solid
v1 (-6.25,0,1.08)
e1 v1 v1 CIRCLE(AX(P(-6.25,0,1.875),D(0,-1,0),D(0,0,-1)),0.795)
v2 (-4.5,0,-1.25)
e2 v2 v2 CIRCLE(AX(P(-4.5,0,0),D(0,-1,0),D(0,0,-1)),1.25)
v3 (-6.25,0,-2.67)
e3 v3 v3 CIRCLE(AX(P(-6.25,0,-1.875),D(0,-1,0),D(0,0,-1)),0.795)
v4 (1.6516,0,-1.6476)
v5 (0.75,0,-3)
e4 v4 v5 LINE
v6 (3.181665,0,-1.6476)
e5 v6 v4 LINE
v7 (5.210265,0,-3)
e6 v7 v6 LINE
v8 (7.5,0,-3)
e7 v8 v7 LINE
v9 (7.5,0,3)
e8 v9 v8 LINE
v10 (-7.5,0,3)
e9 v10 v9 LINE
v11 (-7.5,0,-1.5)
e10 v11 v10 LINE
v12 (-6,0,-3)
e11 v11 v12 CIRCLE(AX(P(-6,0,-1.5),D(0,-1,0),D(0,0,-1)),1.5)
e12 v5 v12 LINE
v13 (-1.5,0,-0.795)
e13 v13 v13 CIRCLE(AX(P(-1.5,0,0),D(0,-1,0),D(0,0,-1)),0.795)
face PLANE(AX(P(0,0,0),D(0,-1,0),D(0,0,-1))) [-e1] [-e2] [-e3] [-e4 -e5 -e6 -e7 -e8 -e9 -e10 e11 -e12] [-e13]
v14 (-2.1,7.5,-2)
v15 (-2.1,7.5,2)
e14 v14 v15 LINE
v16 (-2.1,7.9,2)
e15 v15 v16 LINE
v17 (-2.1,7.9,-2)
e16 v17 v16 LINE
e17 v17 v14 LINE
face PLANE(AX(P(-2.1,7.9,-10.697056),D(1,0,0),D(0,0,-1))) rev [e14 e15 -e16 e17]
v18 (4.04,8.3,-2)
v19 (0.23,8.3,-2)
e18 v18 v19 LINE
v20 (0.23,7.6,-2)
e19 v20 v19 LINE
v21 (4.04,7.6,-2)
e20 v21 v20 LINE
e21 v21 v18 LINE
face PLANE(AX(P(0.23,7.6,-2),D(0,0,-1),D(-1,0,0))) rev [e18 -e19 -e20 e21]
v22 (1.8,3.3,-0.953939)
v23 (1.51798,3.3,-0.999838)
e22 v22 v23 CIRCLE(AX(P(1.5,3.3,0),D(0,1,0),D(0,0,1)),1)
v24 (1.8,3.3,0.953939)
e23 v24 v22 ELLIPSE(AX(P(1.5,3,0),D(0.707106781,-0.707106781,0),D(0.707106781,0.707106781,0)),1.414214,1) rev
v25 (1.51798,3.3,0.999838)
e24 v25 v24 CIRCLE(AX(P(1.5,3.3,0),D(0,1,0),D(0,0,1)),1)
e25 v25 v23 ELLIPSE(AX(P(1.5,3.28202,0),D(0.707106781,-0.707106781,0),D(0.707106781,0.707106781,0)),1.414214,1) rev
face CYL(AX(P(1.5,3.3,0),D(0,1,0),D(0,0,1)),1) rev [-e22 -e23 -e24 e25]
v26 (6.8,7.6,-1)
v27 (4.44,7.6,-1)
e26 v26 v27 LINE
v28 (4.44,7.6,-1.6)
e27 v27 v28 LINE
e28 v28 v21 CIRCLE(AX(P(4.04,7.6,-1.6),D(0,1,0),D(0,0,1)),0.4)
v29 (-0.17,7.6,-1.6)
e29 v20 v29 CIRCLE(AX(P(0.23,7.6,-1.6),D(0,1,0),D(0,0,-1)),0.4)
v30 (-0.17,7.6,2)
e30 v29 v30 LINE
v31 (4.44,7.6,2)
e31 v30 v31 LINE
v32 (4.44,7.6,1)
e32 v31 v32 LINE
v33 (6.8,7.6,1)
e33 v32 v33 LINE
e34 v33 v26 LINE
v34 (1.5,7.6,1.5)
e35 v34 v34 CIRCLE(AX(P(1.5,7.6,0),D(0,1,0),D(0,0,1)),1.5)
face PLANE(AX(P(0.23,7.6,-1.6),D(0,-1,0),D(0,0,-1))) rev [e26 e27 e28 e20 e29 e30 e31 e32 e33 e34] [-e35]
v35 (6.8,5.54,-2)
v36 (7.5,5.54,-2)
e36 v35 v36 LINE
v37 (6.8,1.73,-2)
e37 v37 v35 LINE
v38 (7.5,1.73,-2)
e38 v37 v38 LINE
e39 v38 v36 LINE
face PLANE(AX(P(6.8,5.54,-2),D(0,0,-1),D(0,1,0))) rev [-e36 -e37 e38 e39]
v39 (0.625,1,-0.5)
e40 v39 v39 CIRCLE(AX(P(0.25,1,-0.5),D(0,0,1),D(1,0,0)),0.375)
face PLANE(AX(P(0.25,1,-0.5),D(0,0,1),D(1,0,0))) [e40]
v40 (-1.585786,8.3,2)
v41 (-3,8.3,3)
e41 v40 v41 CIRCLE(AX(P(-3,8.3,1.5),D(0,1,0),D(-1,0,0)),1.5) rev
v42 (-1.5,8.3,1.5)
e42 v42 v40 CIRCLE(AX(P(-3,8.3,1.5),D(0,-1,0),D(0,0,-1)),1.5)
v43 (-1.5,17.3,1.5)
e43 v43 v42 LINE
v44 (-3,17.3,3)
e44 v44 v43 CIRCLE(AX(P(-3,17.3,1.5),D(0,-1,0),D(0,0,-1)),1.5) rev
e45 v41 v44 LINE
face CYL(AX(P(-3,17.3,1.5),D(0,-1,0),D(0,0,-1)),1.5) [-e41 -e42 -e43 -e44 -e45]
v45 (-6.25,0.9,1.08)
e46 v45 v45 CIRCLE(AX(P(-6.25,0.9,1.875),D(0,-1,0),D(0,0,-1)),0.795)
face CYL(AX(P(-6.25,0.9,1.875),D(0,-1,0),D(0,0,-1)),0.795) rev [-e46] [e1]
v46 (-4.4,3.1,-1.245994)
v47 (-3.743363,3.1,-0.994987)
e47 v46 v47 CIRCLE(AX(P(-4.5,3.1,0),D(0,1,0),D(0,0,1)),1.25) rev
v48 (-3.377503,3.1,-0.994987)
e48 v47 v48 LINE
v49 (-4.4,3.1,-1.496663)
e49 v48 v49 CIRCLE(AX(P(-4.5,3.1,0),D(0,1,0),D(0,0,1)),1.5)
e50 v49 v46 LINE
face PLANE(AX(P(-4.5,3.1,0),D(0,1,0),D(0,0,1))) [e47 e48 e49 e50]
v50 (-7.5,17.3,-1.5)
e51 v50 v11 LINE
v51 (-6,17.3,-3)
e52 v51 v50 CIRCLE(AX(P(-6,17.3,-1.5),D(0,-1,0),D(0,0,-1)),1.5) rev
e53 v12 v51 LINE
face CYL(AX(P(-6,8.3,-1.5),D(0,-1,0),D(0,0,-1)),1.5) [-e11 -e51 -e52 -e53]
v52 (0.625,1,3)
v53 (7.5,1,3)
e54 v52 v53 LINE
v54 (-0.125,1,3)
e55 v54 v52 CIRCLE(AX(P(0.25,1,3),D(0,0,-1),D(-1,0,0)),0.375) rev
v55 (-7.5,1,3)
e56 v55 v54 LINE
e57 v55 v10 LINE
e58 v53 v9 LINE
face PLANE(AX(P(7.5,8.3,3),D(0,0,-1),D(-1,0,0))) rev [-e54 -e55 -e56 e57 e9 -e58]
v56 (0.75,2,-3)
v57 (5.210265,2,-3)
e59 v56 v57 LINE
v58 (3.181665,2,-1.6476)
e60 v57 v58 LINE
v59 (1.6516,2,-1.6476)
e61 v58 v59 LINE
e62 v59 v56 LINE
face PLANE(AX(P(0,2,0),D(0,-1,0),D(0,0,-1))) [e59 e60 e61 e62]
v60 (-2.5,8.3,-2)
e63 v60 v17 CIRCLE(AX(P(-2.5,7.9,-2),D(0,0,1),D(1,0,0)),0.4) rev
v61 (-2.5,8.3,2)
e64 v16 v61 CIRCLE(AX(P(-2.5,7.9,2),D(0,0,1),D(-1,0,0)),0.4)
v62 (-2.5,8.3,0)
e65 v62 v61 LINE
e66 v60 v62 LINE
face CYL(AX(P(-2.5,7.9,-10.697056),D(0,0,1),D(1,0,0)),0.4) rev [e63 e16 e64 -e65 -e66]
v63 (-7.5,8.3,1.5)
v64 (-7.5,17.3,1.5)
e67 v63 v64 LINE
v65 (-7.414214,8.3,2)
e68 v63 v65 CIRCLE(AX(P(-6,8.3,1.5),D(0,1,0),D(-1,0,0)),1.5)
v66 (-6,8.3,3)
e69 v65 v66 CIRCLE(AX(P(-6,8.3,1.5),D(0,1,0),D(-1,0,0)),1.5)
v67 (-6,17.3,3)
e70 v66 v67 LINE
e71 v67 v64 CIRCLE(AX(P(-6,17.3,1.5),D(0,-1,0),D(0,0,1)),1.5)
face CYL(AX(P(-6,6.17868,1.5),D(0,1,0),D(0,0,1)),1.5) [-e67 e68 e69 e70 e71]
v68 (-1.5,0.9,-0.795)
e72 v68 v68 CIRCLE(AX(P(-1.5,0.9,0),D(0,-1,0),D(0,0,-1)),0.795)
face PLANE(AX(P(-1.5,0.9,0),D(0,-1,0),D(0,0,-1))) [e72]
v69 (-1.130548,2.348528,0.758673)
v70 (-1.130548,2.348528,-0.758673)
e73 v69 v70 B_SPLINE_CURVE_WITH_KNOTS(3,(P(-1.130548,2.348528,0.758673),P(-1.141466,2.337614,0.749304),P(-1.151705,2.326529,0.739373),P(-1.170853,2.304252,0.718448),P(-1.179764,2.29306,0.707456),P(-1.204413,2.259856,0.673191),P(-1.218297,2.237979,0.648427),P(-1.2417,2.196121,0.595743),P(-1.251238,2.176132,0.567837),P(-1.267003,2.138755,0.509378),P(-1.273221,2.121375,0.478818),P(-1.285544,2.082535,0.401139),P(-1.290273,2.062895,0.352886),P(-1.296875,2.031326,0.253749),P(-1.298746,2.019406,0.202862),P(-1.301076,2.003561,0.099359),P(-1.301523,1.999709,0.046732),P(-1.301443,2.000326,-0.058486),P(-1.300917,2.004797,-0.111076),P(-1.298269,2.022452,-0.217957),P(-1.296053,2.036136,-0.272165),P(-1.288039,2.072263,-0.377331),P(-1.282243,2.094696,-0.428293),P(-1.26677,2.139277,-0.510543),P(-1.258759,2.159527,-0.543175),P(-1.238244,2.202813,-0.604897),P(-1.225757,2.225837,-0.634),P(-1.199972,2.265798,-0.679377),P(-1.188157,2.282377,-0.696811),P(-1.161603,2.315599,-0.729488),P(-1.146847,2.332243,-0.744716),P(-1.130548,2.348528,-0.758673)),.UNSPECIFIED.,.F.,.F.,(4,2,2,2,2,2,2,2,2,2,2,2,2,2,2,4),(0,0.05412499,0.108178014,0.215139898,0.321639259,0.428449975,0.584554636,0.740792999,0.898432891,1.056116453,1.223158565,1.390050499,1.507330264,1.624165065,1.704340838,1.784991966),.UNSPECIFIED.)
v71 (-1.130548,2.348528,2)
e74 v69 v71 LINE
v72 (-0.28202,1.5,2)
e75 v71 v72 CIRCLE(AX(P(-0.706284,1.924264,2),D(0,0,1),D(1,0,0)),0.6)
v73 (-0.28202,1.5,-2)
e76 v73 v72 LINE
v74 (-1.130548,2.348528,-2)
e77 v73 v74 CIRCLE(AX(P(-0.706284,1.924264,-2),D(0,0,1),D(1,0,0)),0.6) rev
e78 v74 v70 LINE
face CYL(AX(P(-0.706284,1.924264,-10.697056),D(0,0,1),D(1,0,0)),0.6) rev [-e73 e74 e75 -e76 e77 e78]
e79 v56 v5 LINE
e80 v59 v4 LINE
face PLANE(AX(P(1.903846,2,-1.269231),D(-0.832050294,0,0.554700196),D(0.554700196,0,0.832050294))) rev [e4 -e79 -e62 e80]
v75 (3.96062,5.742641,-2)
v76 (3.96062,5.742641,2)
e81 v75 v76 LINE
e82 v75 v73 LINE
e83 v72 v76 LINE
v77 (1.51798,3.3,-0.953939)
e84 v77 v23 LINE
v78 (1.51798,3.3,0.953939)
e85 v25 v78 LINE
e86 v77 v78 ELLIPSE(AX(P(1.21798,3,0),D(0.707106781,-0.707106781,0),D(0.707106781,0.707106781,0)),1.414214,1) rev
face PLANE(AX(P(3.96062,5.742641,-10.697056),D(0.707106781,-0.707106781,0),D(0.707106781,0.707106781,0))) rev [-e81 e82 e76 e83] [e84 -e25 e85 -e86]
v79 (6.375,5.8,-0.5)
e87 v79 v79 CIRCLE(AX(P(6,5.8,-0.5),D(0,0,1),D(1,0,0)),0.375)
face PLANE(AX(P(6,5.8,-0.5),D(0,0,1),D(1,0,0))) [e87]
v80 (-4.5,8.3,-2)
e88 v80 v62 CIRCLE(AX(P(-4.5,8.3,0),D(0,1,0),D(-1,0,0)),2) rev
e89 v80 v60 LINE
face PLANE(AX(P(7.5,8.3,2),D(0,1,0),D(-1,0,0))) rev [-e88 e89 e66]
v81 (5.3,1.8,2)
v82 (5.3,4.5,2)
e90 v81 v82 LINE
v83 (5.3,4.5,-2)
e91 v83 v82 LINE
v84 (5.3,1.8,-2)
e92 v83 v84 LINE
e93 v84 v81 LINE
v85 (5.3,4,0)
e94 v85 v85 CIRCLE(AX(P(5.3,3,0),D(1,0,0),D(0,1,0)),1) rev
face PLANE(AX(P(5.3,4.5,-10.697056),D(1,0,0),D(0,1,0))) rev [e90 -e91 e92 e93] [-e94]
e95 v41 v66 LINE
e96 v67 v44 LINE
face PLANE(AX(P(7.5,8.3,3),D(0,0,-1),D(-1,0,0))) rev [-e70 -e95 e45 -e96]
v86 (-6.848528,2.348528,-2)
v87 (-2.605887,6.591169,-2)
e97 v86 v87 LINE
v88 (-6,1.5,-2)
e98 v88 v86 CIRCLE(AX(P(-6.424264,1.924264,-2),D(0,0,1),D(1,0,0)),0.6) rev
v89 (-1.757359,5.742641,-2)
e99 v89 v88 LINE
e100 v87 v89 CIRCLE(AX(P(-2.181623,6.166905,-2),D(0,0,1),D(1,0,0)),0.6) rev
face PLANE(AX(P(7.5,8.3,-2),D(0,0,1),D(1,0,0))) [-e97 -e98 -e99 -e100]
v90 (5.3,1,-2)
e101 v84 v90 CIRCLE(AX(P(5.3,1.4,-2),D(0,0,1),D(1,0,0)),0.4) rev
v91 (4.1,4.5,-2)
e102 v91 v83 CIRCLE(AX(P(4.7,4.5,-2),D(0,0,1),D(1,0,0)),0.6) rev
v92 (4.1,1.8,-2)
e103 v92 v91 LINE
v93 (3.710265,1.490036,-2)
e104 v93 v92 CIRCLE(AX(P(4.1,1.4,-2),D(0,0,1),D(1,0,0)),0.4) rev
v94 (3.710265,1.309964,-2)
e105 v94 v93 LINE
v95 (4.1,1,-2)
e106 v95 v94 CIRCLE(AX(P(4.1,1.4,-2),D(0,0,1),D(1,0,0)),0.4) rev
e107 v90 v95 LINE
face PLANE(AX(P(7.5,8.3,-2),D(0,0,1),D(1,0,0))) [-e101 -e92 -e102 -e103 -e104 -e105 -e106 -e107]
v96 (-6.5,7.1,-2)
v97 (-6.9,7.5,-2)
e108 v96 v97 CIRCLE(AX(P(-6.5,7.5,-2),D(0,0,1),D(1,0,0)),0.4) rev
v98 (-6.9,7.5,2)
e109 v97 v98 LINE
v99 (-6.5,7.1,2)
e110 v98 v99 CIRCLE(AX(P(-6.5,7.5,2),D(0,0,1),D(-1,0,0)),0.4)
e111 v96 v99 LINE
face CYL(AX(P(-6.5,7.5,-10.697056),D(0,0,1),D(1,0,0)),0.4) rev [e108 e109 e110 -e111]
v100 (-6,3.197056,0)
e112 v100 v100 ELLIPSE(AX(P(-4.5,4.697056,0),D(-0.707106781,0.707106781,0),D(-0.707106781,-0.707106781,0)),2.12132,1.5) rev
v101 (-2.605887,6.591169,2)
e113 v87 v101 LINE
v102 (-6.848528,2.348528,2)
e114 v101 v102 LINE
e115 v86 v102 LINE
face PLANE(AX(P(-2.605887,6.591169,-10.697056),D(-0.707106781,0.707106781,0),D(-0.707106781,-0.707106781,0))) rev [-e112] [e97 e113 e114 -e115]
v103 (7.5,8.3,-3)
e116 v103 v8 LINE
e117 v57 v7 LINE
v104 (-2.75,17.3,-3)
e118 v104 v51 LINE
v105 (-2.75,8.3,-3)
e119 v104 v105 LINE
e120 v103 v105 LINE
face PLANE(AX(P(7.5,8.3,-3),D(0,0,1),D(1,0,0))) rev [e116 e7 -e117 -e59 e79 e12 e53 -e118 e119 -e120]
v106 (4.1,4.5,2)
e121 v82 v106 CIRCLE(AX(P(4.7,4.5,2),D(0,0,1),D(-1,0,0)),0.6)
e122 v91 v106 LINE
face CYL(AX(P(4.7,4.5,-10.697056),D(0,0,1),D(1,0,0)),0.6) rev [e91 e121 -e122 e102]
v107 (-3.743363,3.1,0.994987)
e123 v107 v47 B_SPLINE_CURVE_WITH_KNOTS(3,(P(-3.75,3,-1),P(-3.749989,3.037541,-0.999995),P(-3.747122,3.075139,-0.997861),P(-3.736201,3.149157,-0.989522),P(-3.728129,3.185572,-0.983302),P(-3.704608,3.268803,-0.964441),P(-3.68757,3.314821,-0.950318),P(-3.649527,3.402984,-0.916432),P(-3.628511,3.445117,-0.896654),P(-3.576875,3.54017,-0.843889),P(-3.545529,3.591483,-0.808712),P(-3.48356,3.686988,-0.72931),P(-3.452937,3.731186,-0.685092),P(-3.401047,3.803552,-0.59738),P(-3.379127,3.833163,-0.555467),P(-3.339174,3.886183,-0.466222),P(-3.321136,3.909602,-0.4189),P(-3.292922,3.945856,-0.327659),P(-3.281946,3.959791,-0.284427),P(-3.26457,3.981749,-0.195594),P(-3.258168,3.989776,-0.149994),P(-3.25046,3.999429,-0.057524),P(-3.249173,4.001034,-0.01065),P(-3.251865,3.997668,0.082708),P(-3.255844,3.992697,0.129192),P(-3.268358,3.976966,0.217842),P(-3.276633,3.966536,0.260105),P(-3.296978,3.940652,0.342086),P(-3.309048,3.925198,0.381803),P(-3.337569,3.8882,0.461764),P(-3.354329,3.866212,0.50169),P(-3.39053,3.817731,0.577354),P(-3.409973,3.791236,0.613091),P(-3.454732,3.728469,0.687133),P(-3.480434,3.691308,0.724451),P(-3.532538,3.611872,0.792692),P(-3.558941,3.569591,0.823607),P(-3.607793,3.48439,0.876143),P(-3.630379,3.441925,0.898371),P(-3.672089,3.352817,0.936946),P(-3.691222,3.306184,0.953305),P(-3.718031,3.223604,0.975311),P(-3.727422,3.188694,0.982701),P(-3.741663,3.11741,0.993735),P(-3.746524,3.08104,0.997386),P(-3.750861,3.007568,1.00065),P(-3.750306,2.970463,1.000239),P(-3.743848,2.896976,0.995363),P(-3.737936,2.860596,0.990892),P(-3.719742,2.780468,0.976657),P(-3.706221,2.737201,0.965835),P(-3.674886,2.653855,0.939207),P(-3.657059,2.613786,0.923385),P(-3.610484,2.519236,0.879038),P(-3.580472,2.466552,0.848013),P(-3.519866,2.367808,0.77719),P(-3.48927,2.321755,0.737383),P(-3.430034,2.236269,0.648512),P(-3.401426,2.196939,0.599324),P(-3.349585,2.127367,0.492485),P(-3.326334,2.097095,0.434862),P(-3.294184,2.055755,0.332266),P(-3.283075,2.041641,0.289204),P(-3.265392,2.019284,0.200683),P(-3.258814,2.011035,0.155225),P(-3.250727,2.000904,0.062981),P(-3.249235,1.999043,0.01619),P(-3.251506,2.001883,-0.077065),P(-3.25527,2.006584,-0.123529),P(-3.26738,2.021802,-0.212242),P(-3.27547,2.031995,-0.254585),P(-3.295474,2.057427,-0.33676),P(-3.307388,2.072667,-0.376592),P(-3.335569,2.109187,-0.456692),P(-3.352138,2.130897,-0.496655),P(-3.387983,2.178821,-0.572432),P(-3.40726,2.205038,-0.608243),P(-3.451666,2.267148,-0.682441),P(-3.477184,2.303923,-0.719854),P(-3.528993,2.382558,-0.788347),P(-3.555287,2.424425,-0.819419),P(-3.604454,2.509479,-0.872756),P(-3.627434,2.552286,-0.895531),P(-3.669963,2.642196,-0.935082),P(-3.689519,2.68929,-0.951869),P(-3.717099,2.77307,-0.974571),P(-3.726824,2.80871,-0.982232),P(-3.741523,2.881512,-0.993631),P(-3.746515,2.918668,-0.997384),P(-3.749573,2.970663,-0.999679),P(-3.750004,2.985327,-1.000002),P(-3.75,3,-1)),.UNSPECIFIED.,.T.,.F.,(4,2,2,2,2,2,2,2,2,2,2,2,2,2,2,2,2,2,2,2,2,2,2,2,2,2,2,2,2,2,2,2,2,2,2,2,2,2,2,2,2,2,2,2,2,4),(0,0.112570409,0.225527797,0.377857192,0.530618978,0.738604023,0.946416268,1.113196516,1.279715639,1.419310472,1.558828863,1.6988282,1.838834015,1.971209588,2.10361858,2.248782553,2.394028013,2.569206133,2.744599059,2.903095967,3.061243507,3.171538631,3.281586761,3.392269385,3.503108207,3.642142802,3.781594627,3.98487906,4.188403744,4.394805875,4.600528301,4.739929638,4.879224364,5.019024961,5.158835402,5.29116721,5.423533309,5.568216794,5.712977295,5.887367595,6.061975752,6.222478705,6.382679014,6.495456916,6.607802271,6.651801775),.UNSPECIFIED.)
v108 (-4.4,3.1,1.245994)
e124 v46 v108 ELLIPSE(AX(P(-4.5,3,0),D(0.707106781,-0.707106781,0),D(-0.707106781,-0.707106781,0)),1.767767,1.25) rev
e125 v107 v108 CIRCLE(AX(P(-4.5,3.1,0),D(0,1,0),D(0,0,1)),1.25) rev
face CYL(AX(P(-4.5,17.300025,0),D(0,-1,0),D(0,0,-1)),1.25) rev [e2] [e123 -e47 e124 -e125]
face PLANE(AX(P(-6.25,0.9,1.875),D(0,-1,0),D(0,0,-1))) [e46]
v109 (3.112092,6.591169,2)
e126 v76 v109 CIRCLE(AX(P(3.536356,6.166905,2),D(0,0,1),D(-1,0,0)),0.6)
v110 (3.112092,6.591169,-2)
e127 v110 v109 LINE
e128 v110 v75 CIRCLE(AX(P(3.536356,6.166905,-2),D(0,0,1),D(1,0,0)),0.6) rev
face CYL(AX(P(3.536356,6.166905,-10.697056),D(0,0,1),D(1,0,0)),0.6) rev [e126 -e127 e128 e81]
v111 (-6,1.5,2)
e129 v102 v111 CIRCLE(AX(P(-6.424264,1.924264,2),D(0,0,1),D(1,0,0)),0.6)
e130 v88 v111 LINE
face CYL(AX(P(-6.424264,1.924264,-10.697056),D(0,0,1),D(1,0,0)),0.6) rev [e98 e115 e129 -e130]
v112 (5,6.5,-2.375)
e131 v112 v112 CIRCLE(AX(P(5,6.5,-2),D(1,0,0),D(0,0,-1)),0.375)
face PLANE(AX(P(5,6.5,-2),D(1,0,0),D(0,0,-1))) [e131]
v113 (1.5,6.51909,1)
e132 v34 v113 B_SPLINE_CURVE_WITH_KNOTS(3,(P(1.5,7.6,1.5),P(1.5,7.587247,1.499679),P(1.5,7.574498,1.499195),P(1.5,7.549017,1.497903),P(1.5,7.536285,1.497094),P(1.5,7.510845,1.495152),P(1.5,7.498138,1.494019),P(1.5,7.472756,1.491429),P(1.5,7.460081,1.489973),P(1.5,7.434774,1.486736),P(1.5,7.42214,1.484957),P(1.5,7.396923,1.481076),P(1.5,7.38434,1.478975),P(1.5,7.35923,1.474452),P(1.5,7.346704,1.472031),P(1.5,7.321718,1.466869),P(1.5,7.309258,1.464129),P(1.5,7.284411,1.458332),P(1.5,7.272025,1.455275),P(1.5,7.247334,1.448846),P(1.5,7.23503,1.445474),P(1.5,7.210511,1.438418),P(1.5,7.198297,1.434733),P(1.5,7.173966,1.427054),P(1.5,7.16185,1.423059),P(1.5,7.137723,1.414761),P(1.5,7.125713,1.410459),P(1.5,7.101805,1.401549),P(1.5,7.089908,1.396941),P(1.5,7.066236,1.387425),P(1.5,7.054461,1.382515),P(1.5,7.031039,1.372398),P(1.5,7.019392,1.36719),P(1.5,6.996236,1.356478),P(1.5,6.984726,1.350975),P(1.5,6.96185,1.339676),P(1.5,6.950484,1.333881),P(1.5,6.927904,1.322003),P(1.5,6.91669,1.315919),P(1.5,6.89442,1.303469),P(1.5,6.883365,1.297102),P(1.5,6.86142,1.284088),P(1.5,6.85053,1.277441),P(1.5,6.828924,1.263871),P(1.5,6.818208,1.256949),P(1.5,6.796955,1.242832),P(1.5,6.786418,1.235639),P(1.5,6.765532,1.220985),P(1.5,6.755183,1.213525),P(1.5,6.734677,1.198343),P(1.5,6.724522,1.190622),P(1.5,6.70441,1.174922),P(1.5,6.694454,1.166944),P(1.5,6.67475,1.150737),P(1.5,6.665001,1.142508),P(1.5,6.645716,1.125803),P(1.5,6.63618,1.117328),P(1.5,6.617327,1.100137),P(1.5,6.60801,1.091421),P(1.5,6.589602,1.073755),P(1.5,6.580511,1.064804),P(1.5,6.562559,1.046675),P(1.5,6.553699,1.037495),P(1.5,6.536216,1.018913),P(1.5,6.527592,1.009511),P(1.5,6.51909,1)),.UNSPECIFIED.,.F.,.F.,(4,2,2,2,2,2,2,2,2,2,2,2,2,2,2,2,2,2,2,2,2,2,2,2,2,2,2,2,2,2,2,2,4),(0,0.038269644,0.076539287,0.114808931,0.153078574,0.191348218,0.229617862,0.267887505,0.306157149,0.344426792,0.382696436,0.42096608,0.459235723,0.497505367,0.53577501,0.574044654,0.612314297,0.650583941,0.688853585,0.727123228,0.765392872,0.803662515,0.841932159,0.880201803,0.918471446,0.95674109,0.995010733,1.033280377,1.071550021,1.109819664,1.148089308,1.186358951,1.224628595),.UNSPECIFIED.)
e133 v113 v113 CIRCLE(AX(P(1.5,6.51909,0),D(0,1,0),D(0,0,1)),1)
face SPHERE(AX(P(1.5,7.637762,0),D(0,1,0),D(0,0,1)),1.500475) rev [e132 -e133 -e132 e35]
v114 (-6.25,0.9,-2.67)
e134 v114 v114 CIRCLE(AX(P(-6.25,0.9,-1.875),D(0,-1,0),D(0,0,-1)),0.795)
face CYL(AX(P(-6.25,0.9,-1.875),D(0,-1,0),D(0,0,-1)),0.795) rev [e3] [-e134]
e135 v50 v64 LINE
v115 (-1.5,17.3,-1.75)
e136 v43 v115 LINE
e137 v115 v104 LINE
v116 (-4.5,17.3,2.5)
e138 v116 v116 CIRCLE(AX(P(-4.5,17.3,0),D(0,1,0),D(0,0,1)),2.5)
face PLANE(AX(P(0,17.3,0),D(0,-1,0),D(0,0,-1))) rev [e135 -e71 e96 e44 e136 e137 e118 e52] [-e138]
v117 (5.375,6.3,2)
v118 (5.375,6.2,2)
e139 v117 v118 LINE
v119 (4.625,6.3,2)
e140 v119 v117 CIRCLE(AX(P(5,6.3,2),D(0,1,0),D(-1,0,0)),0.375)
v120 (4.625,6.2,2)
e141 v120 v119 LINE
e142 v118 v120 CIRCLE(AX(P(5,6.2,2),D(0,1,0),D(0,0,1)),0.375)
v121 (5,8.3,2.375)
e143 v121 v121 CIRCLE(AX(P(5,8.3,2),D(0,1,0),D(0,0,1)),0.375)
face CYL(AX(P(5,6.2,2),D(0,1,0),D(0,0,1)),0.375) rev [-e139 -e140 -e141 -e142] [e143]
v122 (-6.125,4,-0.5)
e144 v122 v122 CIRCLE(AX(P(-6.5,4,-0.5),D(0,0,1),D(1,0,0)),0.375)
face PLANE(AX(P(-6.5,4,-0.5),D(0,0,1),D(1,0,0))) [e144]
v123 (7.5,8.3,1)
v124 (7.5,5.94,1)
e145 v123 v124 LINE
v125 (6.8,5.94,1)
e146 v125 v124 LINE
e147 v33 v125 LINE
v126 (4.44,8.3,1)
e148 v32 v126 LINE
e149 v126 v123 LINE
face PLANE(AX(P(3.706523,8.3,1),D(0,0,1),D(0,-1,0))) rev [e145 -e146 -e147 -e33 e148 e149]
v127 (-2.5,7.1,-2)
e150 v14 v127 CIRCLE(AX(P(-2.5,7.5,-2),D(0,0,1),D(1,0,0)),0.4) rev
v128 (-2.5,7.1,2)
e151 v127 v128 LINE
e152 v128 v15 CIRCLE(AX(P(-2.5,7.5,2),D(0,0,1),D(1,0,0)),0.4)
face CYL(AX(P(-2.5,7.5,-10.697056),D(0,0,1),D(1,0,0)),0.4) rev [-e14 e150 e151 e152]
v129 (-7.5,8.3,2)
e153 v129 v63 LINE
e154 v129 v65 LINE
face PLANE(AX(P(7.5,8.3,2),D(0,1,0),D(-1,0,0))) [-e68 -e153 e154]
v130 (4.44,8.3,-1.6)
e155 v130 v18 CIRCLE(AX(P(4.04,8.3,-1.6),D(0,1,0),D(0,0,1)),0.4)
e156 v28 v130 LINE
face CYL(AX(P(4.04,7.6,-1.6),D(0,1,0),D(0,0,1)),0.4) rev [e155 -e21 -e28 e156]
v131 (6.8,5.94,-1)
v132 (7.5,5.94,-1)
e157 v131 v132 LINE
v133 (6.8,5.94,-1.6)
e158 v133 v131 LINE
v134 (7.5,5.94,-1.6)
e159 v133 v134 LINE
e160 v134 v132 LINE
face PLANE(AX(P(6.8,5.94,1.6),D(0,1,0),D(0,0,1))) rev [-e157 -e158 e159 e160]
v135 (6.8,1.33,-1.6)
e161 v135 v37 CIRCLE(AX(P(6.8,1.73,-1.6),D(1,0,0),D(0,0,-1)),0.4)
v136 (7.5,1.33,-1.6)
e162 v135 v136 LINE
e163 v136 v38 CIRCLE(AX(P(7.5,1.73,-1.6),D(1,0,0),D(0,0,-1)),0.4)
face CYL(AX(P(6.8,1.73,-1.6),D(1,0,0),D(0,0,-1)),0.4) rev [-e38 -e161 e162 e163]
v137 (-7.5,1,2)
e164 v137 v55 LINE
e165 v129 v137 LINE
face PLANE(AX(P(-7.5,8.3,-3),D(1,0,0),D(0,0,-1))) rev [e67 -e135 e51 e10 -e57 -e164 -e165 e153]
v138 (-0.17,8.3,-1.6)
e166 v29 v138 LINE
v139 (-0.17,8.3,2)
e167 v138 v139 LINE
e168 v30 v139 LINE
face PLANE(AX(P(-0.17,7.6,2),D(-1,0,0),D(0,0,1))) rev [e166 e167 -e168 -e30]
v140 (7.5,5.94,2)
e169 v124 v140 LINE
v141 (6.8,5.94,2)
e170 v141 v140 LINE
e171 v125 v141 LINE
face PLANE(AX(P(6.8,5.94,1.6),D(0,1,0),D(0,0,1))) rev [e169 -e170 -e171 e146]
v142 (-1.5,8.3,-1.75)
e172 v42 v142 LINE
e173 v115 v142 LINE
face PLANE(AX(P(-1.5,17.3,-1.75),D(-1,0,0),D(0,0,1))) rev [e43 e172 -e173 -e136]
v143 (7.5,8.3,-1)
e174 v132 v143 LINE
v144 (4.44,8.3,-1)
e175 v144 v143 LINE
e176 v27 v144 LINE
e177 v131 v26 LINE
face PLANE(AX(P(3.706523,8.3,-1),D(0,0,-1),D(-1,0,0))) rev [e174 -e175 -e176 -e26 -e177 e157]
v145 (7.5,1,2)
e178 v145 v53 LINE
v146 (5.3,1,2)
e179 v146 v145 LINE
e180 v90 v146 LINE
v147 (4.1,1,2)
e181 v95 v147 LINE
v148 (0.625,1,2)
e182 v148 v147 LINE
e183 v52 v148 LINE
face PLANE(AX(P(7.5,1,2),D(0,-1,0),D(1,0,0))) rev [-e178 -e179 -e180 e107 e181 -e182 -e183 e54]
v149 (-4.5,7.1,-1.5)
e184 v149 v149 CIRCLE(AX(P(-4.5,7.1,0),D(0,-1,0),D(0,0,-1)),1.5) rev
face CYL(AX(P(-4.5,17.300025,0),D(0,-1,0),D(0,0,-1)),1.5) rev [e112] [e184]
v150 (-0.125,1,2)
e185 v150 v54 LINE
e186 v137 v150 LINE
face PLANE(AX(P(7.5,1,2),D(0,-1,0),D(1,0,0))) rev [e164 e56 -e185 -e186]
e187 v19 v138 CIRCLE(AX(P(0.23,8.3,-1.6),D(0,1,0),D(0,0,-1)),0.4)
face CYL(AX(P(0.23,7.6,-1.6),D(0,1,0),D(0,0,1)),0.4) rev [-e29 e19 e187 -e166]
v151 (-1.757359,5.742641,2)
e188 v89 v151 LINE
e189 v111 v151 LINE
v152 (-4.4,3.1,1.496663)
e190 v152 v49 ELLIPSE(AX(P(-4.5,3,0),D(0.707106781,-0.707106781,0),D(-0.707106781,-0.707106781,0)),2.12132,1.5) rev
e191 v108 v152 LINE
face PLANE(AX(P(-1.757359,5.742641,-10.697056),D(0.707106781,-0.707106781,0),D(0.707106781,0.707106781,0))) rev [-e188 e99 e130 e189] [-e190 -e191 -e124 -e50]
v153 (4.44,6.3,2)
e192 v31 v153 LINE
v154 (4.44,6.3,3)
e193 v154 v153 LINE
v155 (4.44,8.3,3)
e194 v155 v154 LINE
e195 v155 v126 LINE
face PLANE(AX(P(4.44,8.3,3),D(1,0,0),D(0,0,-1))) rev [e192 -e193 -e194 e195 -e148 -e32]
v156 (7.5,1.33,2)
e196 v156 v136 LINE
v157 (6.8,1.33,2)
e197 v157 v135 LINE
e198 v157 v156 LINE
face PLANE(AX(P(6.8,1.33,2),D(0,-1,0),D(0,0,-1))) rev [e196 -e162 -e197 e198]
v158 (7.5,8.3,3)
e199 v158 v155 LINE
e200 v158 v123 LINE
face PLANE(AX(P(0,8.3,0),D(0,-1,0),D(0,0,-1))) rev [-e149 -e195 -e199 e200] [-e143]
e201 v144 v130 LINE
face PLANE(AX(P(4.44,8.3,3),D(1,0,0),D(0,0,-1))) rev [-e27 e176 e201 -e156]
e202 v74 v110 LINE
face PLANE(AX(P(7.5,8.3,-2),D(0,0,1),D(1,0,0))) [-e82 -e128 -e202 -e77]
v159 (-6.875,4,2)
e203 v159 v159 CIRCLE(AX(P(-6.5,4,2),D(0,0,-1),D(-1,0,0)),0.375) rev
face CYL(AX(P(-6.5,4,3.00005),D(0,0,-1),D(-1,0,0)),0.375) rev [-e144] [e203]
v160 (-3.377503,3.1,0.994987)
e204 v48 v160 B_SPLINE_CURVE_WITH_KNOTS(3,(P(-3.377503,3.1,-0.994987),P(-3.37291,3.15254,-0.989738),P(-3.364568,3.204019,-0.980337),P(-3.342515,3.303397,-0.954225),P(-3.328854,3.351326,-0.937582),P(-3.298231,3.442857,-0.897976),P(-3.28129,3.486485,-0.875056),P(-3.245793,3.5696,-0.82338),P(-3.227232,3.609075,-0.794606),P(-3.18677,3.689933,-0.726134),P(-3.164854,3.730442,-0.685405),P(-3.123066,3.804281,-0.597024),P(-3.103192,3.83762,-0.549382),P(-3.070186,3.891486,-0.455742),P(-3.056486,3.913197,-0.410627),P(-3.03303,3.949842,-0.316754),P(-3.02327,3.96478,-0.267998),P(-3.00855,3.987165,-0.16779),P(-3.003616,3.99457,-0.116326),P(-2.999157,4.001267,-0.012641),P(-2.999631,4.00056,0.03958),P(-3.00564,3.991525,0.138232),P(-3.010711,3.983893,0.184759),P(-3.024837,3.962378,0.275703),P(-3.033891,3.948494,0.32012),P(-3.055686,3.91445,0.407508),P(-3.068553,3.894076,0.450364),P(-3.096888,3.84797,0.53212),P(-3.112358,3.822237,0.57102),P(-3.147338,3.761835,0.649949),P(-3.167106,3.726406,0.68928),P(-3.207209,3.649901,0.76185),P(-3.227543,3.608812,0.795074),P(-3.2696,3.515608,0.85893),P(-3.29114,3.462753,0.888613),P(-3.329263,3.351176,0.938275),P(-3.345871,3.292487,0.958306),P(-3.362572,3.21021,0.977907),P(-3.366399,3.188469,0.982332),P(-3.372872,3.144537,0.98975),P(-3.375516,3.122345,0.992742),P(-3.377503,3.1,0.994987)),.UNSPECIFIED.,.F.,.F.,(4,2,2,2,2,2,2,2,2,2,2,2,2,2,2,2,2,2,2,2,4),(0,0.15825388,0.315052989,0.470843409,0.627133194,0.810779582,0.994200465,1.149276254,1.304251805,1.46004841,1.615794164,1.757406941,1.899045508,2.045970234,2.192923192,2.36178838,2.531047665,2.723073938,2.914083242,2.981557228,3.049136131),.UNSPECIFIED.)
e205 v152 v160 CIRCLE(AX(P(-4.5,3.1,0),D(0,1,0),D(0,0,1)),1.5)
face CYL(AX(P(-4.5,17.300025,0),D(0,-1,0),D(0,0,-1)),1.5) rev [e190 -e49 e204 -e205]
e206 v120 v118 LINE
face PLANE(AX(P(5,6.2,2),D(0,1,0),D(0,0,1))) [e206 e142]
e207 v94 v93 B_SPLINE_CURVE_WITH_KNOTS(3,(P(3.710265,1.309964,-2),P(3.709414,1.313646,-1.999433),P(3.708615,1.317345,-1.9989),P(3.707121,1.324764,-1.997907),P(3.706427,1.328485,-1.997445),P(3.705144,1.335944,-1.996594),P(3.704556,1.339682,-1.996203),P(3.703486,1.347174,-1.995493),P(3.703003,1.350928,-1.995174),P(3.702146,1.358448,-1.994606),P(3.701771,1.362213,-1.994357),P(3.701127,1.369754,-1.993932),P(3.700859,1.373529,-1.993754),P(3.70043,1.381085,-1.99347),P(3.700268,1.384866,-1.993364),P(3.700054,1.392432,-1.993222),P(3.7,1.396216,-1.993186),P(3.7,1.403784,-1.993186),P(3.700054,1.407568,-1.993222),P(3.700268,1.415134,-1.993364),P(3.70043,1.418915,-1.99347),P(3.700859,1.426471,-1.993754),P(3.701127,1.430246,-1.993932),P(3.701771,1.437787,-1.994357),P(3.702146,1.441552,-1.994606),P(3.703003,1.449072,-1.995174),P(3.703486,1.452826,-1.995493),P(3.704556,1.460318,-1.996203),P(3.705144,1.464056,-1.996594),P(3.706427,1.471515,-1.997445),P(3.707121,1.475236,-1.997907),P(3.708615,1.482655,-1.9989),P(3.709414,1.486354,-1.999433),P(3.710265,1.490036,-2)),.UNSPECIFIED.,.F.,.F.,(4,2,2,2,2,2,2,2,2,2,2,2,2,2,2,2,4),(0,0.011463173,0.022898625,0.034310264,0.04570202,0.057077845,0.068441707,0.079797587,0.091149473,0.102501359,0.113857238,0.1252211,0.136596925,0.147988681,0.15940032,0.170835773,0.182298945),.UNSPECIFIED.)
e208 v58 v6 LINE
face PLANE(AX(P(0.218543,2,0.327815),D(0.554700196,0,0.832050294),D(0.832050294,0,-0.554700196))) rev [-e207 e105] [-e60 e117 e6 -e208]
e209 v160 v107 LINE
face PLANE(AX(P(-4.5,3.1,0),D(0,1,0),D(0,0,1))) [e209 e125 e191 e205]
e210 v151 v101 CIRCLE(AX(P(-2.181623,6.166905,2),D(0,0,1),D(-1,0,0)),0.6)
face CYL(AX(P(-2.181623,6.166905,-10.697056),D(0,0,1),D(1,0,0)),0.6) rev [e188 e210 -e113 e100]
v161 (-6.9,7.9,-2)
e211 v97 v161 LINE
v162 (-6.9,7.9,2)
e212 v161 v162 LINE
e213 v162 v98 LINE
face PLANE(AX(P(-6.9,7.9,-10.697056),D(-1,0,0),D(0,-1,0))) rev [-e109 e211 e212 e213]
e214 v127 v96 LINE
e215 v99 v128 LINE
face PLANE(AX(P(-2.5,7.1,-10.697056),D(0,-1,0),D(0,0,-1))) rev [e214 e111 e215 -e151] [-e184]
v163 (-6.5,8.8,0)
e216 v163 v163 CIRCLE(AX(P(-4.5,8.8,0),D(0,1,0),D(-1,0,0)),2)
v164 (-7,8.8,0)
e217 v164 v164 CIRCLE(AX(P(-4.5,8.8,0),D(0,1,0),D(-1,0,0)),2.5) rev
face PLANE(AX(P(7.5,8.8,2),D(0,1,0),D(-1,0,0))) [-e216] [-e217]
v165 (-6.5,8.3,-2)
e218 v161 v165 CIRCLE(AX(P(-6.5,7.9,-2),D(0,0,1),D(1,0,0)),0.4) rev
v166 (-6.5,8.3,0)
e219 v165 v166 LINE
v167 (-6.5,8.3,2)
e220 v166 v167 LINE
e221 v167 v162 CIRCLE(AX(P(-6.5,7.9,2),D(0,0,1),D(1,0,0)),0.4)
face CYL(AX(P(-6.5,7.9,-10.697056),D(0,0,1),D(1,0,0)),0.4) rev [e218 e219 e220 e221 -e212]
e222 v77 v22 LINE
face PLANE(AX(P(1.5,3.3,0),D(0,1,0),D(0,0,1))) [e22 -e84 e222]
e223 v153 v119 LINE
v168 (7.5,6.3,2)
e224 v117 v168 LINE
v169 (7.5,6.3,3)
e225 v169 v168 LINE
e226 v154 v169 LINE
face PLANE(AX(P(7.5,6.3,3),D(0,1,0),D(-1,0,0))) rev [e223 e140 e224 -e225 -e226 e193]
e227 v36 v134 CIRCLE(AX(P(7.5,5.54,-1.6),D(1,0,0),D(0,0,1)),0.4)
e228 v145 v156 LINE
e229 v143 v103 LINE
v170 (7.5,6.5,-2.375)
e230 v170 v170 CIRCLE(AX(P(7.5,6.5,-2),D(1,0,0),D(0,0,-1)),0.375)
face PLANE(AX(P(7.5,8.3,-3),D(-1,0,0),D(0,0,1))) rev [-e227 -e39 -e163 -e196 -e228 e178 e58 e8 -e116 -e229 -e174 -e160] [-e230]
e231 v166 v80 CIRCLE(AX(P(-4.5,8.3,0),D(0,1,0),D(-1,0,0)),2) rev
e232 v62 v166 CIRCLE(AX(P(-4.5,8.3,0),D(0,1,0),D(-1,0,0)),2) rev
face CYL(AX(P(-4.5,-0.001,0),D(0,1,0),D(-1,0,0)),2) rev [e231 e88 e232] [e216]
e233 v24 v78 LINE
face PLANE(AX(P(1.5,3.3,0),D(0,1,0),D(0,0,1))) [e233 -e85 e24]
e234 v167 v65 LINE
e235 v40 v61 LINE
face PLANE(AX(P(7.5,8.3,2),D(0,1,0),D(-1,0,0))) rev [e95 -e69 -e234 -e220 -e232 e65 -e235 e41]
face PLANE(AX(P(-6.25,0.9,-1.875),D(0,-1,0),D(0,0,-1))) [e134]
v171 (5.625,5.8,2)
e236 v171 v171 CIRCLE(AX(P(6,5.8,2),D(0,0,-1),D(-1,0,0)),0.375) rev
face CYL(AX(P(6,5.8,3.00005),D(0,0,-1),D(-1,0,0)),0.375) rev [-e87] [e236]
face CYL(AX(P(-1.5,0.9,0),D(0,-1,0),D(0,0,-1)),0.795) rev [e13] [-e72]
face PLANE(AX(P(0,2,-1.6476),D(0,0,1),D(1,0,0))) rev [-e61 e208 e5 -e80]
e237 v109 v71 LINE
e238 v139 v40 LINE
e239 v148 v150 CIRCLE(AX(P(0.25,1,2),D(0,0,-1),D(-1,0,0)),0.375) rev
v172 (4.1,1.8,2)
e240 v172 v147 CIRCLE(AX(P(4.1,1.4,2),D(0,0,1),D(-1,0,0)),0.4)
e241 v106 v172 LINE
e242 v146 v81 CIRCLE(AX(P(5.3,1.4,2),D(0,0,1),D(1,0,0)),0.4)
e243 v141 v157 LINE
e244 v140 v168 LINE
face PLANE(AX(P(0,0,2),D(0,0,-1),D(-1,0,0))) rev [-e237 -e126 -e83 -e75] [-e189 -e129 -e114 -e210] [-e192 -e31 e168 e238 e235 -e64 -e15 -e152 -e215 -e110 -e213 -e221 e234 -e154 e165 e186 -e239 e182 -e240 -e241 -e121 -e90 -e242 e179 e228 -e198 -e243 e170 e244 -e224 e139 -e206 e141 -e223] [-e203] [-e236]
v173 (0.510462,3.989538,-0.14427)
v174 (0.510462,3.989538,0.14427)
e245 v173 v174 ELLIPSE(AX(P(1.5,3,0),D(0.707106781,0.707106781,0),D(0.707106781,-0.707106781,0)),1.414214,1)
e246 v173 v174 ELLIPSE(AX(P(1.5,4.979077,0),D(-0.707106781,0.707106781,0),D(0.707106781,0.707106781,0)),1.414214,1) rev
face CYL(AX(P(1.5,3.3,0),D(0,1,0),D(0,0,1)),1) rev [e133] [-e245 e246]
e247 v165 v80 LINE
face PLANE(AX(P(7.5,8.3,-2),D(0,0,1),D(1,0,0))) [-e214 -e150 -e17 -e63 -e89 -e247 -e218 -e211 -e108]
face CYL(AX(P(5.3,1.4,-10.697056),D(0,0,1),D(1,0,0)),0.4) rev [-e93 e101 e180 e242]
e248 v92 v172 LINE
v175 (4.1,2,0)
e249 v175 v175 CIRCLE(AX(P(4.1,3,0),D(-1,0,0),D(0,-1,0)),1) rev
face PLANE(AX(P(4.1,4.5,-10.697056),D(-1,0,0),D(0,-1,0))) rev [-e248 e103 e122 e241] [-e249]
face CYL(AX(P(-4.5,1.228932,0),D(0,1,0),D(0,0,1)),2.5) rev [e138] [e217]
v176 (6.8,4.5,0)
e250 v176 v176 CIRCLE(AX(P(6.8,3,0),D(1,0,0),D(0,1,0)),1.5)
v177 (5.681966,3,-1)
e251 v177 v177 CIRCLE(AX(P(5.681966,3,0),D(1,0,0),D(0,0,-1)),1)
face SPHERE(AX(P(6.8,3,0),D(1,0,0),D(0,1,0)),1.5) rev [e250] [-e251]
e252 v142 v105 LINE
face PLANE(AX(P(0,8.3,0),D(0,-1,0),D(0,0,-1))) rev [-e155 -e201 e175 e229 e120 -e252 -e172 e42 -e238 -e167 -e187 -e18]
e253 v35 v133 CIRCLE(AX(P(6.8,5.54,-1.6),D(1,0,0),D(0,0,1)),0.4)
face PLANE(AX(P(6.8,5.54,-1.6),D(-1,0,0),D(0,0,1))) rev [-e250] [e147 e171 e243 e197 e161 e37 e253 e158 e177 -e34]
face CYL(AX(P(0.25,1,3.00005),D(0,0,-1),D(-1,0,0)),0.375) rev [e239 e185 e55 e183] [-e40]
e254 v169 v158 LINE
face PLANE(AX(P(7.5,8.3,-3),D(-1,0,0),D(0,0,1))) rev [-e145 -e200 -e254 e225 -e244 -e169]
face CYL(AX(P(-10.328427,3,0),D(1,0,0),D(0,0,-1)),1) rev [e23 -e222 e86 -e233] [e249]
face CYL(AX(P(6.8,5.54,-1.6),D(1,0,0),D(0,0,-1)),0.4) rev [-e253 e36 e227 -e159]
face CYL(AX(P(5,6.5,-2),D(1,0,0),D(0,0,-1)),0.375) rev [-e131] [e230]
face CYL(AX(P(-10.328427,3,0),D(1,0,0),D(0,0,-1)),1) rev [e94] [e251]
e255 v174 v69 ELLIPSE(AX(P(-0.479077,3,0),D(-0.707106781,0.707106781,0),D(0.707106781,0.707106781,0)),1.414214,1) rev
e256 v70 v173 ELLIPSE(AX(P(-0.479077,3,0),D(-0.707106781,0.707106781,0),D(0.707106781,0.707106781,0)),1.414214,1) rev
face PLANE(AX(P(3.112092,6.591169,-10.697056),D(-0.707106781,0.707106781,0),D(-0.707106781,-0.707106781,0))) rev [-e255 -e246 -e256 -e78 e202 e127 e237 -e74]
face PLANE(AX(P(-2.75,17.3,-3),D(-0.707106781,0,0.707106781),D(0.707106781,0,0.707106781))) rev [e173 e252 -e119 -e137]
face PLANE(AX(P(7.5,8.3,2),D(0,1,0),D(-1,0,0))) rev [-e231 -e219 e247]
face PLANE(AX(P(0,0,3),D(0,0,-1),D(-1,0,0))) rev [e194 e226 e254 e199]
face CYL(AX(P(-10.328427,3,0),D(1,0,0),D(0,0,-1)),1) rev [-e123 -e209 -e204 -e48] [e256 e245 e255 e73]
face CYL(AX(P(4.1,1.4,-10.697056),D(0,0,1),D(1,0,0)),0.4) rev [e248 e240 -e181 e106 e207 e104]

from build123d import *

# Parameters (mm, degrees)
SKETCH1_W                        = 15
SKETCH1_H                        = 6
MAIN_BODY_EXT_DEPTH              = 8.3
EMISSION_PATH_EXT_DEPTH          = 9
SKETCH3_R                        = 1.25
EMISSION_AND_GRIN_CUT_DEPTH      = 20.092931
SKETCH4_R                        = 1
DRUM_LENS_CUT_DEPTH              = 13
SKETCH41_R                       = 1
ADDTL_LIGHT_SOURCE_DEPTH         = 5
SKETCH5_W                        = 15
SKETCH5_H                        = 7.3
FILTERCOVER_CUT1_DEPTH           = 1
TOP_LED_SCREW_W                  = 3.06
TOP_LED_SCREW_H                  = 2
BOSS_EXTRUDE1_DEPTH              = 1
FILTERSET_CUT2_DEPTH             = 4
SKETCH10_R                       = 2.5
EMISSION_LENS_CUT_DEPTH          = 8.5
SKETCH15_R                       = 0.795
MAGNETS_CUT_DEPTH                = 0.9
SCREW_HOLES_CUT_DEPTH            = 20.507434
SCREW_HOLES_CUT_DEPTH_BACK       = 2.5
SKETCH18_R                       = 0.375
EXTERNAL_FILLET_1_R              = 1.5
VERTICAL_PATH_CUT_DEPTH          = 14.011149
VERTICAL_PATH_CUT_DEPTH_BACK     = 4
SKETCH28_R                       = 1.5
CUT_EXTRUDE_ORIGINAL_LIGHT_DEPTH = 0.7
CUT_EXTRUDE_ADDTL_LIGHT_DEPTH    = 0.7
SKETCH29_R                       = 0.375
SIDE_LED_SCREW_DEPTH             = 2.5
SKETCH32_W                       = 2
SKETCH32_H                       = 2.36
SIDE_WIRE_SLOT_CUT_DEPTH         = 0.7
SKETCH45_W                       = 2.36
SKETCH45_H                       = 2
TOP_LED_SLOT_DEPTH               = 0.7
CUT_EXTRUDE16_DEPTH              = 9
CUT_EXTRUDE17_REACH              = 13.945
SKETCH37_R                       = 2
SKETCH51_R                       = 0.375
TOP_LE_SCREW_DEPTH               = 2.1
CUT_EXTRUDE20_DEPTH              = 2


with BuildPart() as part:
    # Sketch1 → Main Body Ext (new body)
    with BuildSketch(Plane(origin=(0, 0, 0), x_dir=(1, 0, 0), z_dir=(0, 1, 0))):
        Rectangle(SKETCH1_W, SKETCH1_H)
    extrude(amount=MAIN_BODY_EXT_DEPTH)

    # Sketch8 → Emission Path Ext (add)
    with BuildSketch(Plane(origin=(0, 8.3, 0), x_dir=(1, 0, 0), z_dir=(0, 1, 0))):
        Polygon((-2.75, 3), (-1.5, 1.75), (-1.5, -3), (-7.5, -3), (-7.5, 3), align=None)
    extrude(amount=EMISSION_PATH_EXT_DEPTH)

    # Sketch3 → Emission and Grin Cut (cut, through all)
    with BuildSketch(Plane.XZ):
        with Locations(Location((-4.5, 0, 0), (0, 0, 270))):
            Circle(SKETCH3_R)
    extrude(amount=-EMISSION_AND_GRIN_CUT_DEPTH, mode=Mode.SUBTRACT)

    # Sketch4 → Drum Lens Cut (cut)
    with BuildSketch(Plane(origin=(7.5, 0, 0), x_dir=(0, 0, -1), z_dir=(1, 0, 0))):
        with Locations((0, 3)):
            Circle(SKETCH4_R)
    extrude(amount=-DRUM_LENS_CUT_DEPTH, mode=Mode.SUBTRACT)

    # Sketch41 → Addtl Light Source (cut)
    with BuildSketch(Plane(origin=(0, 8.3, 0), x_dir=(1, 0, 0), z_dir=(0, 1, 0))):
        with Locations(Location((1.5, 0, 0), (0, 0, 270))):
            Circle(SKETCH41_R)
    extrude(amount=-ADDTL_LIGHT_SOURCE_DEPTH, mode=Mode.SUBTRACT)

    # Sketch5 → FilterCover Cut1 (cut)
    with BuildSketch(Plane.XY.offset(3)):
        with Locations((0, 4.65)):
            Rectangle(SKETCH5_W, SKETCH5_H)
    extrude(amount=-FILTERCOVER_CUT1_DEPTH, mode=Mode.SUBTRACT)

    # Top-LED-Screw → Boss-Extrude1 (add)
    with BuildSketch(Plane.XY.offset(2)):
        with Locations((5.97, 7.3)):
            Rectangle(TOP_LED_SCREW_W, TOP_LED_SCREW_H)
    extrude(amount=BOSS_EXTRUDE1_DEPTH)

    # Sketch6 → FilterSet Cut2 (cut)
    with BuildSketch(Plane.XY.offset(2)):
        with BuildLine():
            Line((5.3, 4.5), (5.3, 1.8))
            ThreePointArc((5.3, 1.8), (5.7, 1.4), (5.3, 1))
            Line((5.3, 1), (4.1, 1))
            ThreePointArc((4.1, 1), (3.7, 1.4), (4.1, 1.8))
            Line((4.1, 1.8), (4.1, 4.5))
            ThreePointArc((4.1, 4.5), (4.7, 5.1), (5.3, 4.5))
        make_face()
        with BuildLine():
            Line((-6.9, 7.9), (-6.9, 7.5))
            ThreePointArc((-6.9, 7.5), (-6.782843, 7.217157), (-6.5, 7.1))
            Line((-6.5, 7.1), (-2.5, 7.1))
            ThreePointArc((-2.5, 7.1), (-2.217157, 7.217157), (-2.1, 7.5))
            Line((-2.1, 7.5), (-2.1, 7.9))
            ThreePointArc((-2.1, 7.9), (-2.217157, 8.182843), (-2.5, 8.3))
            Line((-2.5, 8.3), (-6.5, 8.3))
            ThreePointArc((-6.5, 8.3), (-6.782843, 8.182843), (-6.9, 7.9))
        make_face()
        with BuildLine():
            Line((-2.605887, 6.591169), (-6.848528, 2.348528))
            ThreePointArc((-6.848528, 2.348528), (-6.848528, 1.5), (-6, 1.5))
            Line((-6, 1.5), (-1.757359, 5.742641))
            ThreePointArc((-1.757359, 5.742641), (-1.757359, 6.591169), (-2.605887, 6.591169))
        make_face()
        with BuildLine():
            Line((3.112092, 6.591169), (-1.130548, 2.348528))
            ThreePointArc((-1.130548, 2.348528), (-1.130548, 1.5), (-0.28202, 1.5))
            Line((-0.28202, 1.5), (3.96062, 5.742641))
            ThreePointArc((3.96062, 5.742641), (3.96062, 6.591169), (3.112092, 6.591169))
        make_face()
    extrude(amount=-FILTERSET_CUT2_DEPTH, mode=Mode.SUBTRACT)

    # Sketch10 → Emission Lens Cut (cut)
    with BuildSketch(Plane(origin=(0, 17.3, 0), x_dir=(1, 0, 0), z_dir=(0, 1, 0))):
        with Locations(Location((-4.5, 0, 0), (0, 0, 270))):
            Circle(SKETCH10_R)
    extrude(amount=-EMISSION_LENS_CUT_DEPTH, mode=Mode.SUBTRACT)

    # Sketch15 → Magnets Cut (cut)
    with BuildSketch(Plane.XZ):
        with Locations(Location((-6.25, -1.875, 0), (0, 0, 270))):
            Circle(SKETCH15_R)
        with Locations(Location((-6.25, 1.875, 0), (0, 0, 270))):
            Circle(SKETCH15_R)
        with Locations(Location((-1.5, 0, 0), (0, 0, 270))):
            Circle(SKETCH15_R)
    extrude(amount=-MAGNETS_CUT_DEPTH, mode=Mode.SUBTRACT)

    # Sketch18 → Screw Holes Cut (cut, two sides: drawn at the far end of the back side and taken through both)
    with BuildSketch(Plane.XY.offset(2).offset(-SCREW_HOLES_CUT_DEPTH_BACK)):
        with Locations(Location((-6.5, 4, 0), (0, 0, 180))):
            Circle(SKETCH18_R)
        with Locations(Location((6, 5.8, 0), (0, 0, 180))):
            Circle(SKETCH18_R)
        with Locations((0.25, 1)):
            Circle(SKETCH18_R)
    extrude(amount=SCREW_HOLES_CUT_DEPTH + SCREW_HOLES_CUT_DEPTH_BACK, mode=Mode.SUBTRACT)

    # External Fillet 1
    # the kernel refuses this fillet: 1.5 mm, written as the material it takes off along each edge
    with BuildSketch(Plane(origin=(-7.5, -3.75, -3), x_dir=(1, 0, 0), z_dir=(0, 1, 0))) as external_fillet_1_piece_1:
        with BuildLine():
            CenterArc((EXTERNAL_FILLET_1_R, -EXTERNAL_FILLET_1_R), EXTERNAL_FILLET_1_R, 90, 90)
            Line((0, -EXTERNAL_FILLET_1_R), (0, 0))
            Line((0, 0), (EXTERNAL_FILLET_1_R, 0))
        make_face()
    extrude(amount=24.8, mode=Mode.SUBTRACT)
    with BuildSketch(Plane(origin=(-1.5, 8.3, 3), x_dir=(0, 0, -1), z_dir=(0, 1, 0))) as external_fillet_1_piece_2:
        with BuildLine():
            CenterArc((EXTERNAL_FILLET_1_R, EXTERNAL_FILLET_1_R), EXTERNAL_FILLET_1_R, 180, 90)
            Line((0, EXTERNAL_FILLET_1_R), (0, 0))
            Line((0, 0), (EXTERNAL_FILLET_1_R, 0))
        make_face()
    extrude(amount=12.75, mode=Mode.SUBTRACT)

    # Sketch28 → Vertical-Path-Cut (cut, two sides: drawn at the far end of the back side and taken through both)
    with BuildSketch(Plane(origin=(0, 7.1, 0), x_dir=(1, 0, 0), z_dir=(0, 1, 0)).offset(-VERTICAL_PATH_CUT_DEPTH_BACK)):
        with Locations(Location((-4.5, 0, 0), (0, 0, 180))):
            Circle(SKETCH28_R)
    extrude(amount=VERTICAL_PATH_CUT_DEPTH + VERTICAL_PATH_CUT_DEPTH_BACK, mode=Mode.SUBTRACT)

    # Sketch12 → Cut-Extrude Original Light (cut)
    with BuildSketch(Plane(origin=(7.5, 0, 0), x_dir=(0, 0, -1), z_dir=(1, 0, 0))):
        with BuildLine():
            Line((1.6, 5.94), (-1.6, 5.94))
            Line((-1.6, 5.94), (-2, 5.94))
            Line((-2, 5.94), (-2, 1.33))
            Line((-2, 1.33), (1.6, 1.33))
            ThreePointArc((1.6, 1.33), (1.882843, 1.447157), (2, 1.73))
            Line((2, 1.73), (2, 5.54))
            ThreePointArc((2, 5.54), (1.882843, 5.822843), (1.6, 5.94))
        make_face()
    extrude(amount=-CUT_EXTRUDE_ORIGINAL_LIGHT_DEPTH, mode=Mode.SUBTRACT)

    # Sketch44 → Cut-Extrude Addtl Light (cut)
    with BuildSketch(Plane(origin=(0, 8.3, 0), x_dir=(1, 0, 0), z_dir=(0, 1, 0))):
        with BuildLine():
            Line((-0.17, -2), (4.44, -2))
            Line((4.44, -2), (4.44, 1.6))
            ThreePointArc((4.44, 1.6), (4.322843, 1.882843), (4.04, 2))
            Line((4.04, 2), (0.23, 2))
            ThreePointArc((0.23, 2), (-0.052843, 1.882843), (-0.17, 1.6))
            Line((-0.17, 1.6), (-0.17, -2))
        make_face()
    extrude(amount=-CUT_EXTRUDE_ADDTL_LIGHT_DEPTH, mode=Mode.SUBTRACT)

    # Sketch29 → Side-LED-Screw (cut)
    with BuildSketch(Plane(origin=(7.5, 0, 0), x_dir=(0, 0, -1), z_dir=(1, 0, 0))):
        with Locations((2, 6.5)):
            Circle(SKETCH29_R)
    extrude(amount=-SIDE_LED_SCREW_DEPTH, mode=Mode.SUBTRACT)

    # Sketch32 → Side-Wire-Slot-Cut (cut)
    with BuildSketch(Plane(origin=(7.5, 0, 0), x_dir=(0, 0, -1), z_dir=(1, 0, 0))):
        with Locations((0, 7.12)):
            Rectangle(SKETCH32_W, SKETCH32_H)
    extrude(amount=-SIDE_WIRE_SLOT_CUT_DEPTH, mode=Mode.SUBTRACT)

    # Sketch45 → Top-LED-slot (cut)
    with BuildSketch(Plane(origin=(0, 8.3, 0), x_dir=(1, 0, 0), z_dir=(0, 1, 0))):
        with Locations((5.62, 0)):
            Rectangle(SKETCH45_W, SKETCH45_H)
    extrude(amount=-TOP_LED_SLOT_DEPTH, mode=Mode.SUBTRACT)

    # Sketch33 → Side-BallLens_Cut (revolve, cut)
    with BuildSketch(Plane.XY, mode=Mode.PRIVATE) as side_balllens_cut_sk:
        with BuildLine():
            Line((6.8, 3), (5.3, 3))
            ThreePointArc((5.3, 3), (5.73934, 4.06066), (6.8, 4.5))
            Line((6.8, 4.5), (6.8, 3))
        make_face()
    revolve(side_balllens_cut_sk.sketch.rotate(Axis((6.8, 3, 0), (-1, 0, 0)), 84.26086), axis=Axis((6.8, 3, 0), (-1, 0, 0)), mode=Mode.SUBTRACT)

    # Sketch47 → Top-BallLens_Cut (revolve, cut)
    with BuildSketch(Plane(origin=(1.5, 0, 0), x_dir=(0, 0, -1), z_dir=(1, 0, 0))):
        with BuildLine():
            Line((-1.5, 7.6), (0, 7.6))
            Line((0, 7.6), (0, 6.137287))
            ThreePointArc((0, 6.137287), (-1.04756, 6.563498), (-1.5, 7.6))
        make_face()
    revolve(axis=Axis((1.5, 7.6, 0), (0, -1, 0)), mode=Mode.SUBTRACT)

    # Sketch36 → Cut-Extrude16 (cut)
    with BuildSketch(Plane(origin=(0, 17.3, 0), x_dir=(1, 0, 0), z_dir=(0, 1, 0))):
        with BuildLine():
            Line((-7.5, -1.5), (-7.5, -3))
            Line((-7.5, -3), (-6, -3))
            ThreePointArc((-6, -3), (-7.06066, -2.56066), (-7.5, -1.5))
        make_face()
    extrude(amount=-CUT_EXTRUDE16_DEPTH, mode=Mode.SUBTRACT)

    # Sketch37 → Cut-Extrude17 (cut, up to next)
    with BuildSketch(Plane(origin=(0, 8.8, 0), x_dir=(1, 0, 0), z_dir=(0, 1, 0)), mode=Mode.PRIVATE) as cut_extrude17_sk1:
        with Locations(Location((-4.5, 0, 0), (0, 0, 180))):
            Circle(SKETCH37_R)
    cut_extrude17_tool1 = extrude(cut_extrude17_sk1.sketch, amount=-CUT_EXTRUDE17_REACH, mode=Mode.PRIVATE) & part.part
    add(cut_extrude17_tool1.solids().sort_by_distance((-4.5, 8.8, 0))[0], mode=Mode.SUBTRACT)

    # Sketch51 → Top-LE-Screw (cut)
    with BuildSketch(Plane(origin=(0, 8.3, 0), x_dir=(1, 0, 0), z_dir=(0, 1, 0))):
        with Locations(Location((5, -2, 0), (0, 0, 270))):
            Circle(SKETCH51_R)
    extrude(amount=-TOP_LE_SCREW_DEPTH, mode=Mode.SUBTRACT)

    # Notch → Cut-Extrude20 (cut)
    with BuildSketch(Plane.XZ):
        Polygon((3.181665, -1.6476), (1.6516, -1.6476), (1.6516, -3), (5.210265, -3), align=None)
        Polygon((1.6516, -3), (1.6516, -1.6476), (0.75, -3), align=None)
    extrude(amount=-CUT_EXTRUDE20_DEPTH, mode=Mode.SUBTRACT)


solid = part.part
